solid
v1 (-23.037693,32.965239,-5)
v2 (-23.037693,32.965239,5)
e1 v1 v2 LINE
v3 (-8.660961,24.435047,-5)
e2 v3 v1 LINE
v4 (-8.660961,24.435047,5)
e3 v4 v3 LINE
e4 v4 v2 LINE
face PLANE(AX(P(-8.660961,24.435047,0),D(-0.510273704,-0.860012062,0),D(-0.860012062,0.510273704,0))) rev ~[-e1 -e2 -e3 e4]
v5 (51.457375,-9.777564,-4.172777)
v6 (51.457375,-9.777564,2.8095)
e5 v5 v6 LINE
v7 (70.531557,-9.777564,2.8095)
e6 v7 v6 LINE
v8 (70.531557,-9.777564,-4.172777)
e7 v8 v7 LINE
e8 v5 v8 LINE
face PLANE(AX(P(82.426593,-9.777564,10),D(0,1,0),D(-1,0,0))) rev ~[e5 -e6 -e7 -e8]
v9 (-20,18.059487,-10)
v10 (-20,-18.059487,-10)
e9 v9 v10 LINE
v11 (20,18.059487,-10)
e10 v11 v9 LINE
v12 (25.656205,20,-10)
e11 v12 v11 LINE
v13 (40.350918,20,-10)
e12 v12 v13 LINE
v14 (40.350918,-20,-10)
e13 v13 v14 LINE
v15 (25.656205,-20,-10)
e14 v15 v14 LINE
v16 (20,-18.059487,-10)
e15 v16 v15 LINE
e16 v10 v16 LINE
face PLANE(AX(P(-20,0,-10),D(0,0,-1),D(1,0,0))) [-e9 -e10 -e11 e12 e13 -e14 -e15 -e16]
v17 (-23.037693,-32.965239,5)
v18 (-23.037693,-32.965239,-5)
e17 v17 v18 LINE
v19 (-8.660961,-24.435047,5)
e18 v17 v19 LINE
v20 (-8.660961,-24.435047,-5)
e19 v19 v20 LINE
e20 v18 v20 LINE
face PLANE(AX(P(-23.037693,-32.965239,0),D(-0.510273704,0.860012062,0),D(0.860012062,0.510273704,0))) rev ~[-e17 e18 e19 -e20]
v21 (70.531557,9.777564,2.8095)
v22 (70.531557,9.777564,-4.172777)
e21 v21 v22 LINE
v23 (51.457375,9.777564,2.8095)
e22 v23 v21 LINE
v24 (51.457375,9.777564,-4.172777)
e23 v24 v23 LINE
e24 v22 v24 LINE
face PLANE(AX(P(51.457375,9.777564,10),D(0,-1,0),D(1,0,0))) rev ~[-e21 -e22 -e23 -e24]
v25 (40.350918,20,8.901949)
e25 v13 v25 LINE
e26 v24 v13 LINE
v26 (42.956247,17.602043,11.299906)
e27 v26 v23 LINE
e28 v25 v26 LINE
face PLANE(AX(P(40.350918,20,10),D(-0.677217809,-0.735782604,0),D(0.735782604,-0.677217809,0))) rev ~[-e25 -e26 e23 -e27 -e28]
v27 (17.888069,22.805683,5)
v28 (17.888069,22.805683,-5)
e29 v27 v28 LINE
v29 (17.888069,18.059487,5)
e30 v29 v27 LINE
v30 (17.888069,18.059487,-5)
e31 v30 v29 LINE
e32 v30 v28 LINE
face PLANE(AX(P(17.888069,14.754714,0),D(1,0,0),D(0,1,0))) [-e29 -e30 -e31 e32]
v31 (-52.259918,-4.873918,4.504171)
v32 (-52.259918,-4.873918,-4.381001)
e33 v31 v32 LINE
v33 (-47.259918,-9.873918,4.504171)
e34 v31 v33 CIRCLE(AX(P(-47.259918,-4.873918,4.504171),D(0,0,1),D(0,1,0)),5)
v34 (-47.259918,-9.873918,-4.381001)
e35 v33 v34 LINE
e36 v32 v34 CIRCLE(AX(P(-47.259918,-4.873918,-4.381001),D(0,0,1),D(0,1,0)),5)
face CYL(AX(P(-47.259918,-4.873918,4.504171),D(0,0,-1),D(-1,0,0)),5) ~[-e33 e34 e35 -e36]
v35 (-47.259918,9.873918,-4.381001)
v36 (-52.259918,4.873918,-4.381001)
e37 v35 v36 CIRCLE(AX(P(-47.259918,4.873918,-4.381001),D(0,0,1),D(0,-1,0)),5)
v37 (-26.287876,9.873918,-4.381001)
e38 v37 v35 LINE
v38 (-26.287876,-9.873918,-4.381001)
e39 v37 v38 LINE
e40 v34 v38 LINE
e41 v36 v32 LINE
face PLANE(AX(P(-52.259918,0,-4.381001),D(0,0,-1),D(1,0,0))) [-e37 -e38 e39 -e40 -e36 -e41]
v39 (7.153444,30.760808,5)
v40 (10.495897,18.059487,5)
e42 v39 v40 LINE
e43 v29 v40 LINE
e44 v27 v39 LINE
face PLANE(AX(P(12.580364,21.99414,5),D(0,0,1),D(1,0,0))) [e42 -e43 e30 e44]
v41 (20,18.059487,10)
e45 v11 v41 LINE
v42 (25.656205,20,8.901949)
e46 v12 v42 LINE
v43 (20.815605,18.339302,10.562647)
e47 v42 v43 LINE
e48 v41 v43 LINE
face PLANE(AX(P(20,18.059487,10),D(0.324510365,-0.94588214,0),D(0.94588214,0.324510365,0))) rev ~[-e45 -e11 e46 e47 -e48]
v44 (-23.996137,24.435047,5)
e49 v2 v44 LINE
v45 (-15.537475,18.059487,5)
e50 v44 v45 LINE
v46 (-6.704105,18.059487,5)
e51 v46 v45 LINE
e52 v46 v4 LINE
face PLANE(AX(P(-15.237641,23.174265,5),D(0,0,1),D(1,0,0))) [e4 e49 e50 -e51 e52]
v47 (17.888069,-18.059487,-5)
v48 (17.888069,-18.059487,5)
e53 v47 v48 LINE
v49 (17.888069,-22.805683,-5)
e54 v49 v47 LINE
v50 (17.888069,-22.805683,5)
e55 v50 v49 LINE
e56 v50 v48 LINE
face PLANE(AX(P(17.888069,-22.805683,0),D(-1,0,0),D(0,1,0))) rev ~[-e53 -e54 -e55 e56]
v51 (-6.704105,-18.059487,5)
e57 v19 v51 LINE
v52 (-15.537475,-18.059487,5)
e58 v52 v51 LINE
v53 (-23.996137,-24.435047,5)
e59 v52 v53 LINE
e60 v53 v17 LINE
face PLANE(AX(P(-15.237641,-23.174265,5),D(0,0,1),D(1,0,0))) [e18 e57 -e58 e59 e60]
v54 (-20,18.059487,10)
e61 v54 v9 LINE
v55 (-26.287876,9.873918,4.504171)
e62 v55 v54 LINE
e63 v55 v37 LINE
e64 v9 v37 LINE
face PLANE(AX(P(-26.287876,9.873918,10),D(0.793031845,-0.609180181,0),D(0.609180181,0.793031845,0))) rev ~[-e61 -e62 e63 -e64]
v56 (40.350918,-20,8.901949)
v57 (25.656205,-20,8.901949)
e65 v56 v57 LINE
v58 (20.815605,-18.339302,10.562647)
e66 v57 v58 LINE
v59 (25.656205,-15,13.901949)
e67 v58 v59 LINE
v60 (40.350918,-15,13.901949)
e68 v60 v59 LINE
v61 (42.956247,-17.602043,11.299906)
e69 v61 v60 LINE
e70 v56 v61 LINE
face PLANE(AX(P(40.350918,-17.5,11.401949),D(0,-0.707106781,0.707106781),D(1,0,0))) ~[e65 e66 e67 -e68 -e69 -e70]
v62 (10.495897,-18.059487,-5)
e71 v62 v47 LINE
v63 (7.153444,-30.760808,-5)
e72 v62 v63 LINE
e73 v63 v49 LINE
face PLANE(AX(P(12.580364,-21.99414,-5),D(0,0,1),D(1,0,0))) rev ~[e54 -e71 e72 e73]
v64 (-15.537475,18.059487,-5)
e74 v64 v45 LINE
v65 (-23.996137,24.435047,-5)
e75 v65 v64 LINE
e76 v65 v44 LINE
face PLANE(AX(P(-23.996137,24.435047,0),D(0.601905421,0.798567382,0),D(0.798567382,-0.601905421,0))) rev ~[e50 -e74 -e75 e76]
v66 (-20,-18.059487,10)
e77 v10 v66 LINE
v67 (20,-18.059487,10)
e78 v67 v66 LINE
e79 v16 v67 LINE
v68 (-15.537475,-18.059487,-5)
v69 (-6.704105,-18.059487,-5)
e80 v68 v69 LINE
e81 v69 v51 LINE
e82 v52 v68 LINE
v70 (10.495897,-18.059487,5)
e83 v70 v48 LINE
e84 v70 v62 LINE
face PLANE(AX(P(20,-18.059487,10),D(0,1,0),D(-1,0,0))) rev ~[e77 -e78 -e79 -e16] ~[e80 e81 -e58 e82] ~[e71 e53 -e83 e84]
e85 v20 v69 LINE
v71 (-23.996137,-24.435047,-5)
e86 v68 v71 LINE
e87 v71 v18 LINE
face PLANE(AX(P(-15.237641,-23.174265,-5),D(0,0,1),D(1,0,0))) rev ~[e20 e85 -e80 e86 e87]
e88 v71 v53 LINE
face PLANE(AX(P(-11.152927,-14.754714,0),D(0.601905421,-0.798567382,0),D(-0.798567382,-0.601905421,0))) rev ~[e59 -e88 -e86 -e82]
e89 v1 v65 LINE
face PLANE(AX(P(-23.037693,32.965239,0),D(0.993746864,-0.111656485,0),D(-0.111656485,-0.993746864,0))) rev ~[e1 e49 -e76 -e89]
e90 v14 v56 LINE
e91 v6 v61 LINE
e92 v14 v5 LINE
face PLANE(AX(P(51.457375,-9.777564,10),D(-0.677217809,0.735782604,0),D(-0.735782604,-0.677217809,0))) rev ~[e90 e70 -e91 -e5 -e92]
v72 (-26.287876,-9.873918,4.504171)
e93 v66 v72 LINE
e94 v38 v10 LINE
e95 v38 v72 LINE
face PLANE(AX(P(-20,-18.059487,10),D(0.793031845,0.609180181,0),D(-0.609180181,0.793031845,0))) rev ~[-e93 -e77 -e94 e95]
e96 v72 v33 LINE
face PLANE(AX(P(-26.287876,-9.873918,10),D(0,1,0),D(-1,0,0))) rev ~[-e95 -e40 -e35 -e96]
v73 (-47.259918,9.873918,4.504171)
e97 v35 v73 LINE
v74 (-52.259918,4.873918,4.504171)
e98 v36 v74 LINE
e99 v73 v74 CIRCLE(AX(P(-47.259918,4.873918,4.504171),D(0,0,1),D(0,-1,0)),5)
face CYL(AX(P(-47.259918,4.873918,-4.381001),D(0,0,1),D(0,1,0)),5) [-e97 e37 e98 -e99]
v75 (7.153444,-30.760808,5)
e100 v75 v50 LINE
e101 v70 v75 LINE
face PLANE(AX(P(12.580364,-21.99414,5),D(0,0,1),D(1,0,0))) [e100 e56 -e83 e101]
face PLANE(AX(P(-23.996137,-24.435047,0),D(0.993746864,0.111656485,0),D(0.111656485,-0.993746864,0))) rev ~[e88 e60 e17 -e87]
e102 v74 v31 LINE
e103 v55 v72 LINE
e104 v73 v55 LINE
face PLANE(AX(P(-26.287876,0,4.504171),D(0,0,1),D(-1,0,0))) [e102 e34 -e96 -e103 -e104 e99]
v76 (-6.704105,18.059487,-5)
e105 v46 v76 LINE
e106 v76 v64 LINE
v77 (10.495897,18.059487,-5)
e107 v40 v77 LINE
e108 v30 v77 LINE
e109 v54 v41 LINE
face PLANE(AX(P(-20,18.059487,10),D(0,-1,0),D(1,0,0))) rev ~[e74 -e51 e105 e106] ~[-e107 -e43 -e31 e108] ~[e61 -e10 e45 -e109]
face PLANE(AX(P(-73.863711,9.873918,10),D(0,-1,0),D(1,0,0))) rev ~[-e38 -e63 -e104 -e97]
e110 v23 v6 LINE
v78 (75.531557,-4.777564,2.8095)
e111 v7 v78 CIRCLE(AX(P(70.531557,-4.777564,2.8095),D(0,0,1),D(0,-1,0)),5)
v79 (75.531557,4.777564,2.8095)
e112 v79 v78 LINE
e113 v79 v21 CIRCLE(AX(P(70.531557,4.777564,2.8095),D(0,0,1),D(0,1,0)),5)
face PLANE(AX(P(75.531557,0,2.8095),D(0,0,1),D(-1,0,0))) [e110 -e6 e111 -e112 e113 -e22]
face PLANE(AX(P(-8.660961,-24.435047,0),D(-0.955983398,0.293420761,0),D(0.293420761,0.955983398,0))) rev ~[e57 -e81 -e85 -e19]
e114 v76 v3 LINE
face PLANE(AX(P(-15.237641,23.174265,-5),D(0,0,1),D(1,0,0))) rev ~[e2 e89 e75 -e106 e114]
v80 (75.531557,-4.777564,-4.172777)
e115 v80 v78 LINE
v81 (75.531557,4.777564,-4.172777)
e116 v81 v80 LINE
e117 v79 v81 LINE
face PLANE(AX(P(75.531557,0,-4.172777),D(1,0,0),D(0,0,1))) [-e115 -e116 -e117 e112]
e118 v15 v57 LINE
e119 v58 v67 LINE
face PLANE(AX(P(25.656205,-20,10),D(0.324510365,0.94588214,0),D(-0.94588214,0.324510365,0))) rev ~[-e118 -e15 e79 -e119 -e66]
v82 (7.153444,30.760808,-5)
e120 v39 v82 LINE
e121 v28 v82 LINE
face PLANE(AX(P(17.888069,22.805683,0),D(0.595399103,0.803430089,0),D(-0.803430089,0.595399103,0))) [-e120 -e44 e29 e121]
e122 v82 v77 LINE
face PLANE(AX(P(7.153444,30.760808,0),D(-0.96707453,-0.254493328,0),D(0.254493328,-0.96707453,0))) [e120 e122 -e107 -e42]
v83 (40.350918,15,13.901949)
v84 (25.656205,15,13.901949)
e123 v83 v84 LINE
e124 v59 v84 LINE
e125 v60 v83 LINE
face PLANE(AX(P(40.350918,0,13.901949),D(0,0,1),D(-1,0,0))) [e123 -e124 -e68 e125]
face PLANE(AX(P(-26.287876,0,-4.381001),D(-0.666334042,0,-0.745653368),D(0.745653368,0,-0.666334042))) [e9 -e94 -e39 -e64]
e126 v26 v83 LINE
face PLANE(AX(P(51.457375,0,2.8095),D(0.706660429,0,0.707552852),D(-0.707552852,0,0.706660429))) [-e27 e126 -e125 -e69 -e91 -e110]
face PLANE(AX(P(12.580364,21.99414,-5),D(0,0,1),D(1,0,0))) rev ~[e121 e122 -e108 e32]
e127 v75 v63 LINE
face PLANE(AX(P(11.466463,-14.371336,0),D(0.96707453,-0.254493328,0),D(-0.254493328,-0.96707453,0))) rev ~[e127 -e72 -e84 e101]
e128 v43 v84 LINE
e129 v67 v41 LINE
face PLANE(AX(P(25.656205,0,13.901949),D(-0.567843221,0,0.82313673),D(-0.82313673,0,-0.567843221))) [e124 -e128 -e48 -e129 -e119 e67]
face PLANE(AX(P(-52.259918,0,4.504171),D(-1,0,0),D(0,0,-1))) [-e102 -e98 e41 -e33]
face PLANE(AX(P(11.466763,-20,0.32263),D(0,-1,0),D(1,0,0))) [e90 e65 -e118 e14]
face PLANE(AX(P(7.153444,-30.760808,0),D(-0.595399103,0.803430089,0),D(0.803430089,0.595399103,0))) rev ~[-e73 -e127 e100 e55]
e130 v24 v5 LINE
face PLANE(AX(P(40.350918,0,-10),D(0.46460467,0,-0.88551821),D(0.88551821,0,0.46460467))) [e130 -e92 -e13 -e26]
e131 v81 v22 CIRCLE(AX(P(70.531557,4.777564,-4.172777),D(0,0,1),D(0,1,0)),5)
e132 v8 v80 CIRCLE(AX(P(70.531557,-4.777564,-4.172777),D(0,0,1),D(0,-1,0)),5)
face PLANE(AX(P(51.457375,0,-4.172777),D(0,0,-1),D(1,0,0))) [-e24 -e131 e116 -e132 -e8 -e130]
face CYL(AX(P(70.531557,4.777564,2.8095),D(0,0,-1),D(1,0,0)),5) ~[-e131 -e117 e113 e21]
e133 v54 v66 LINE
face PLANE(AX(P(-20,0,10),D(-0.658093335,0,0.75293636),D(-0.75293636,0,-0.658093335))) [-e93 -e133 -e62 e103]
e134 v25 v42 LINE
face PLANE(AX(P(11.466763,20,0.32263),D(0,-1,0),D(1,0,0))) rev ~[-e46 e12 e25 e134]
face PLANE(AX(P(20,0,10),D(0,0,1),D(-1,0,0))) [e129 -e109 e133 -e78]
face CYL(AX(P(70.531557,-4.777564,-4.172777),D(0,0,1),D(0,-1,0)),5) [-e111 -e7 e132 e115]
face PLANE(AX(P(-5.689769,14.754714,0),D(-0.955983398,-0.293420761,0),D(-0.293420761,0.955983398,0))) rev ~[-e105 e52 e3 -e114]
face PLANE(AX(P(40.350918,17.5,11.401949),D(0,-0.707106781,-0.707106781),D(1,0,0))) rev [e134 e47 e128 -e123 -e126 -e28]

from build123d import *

# Parameters (mm, degrees)
F1_DEPTH = 20
F3_DEPTH = 43.4
F5_DEPTH = 5
F6_R     = 5
F8_SIZE  = 5


# Not quite as in the source:
# - a feature names something its author has since deleted; it is built from what else it names


with BuildPart() as f1:
    # F0 (on Front) → F1 (new body, symmetric)
    with BuildSketch(Plane.XZ):
        Polygon((20, 10), (-20, 10), (-26.2878760695, 4.5041712001), (-52.2599183023, 4.5041712001), (-52.2599183023, -4.38100053), (-26.2878760695, -4.38100053), (-20, -10), (20, -10), (40.3509177268, -10), (51.457375288, -4.1727770417), (75.5315572023, -4.1727770417), (75.5315572023, 2.809499735), (51.457375288, 2.809499735), (40.3509177268, 13.9019489288), (25.6562046707, 13.9019489288), align=None)
    extrude(amount=F1_DEPTH, both=True)

    # F2 (on face) → F3 (cut, symmetric)
    with BuildSketch(Plane.XY.offset(10)):
        Polygon((-20, 18.0594865233), (20, 18.0594865233), (25.6562046707, 20), (40.3509177268, 20), (51.457375288, 9.7775636241), (82.4265927076, 9.7775636241), (82.4265927076, -9.7775636241), (51.457375288, -9.7775636241), (40.3509177268, -20), (25.6562046707, -20), (20, -18.0594865233), (-20, -18.0594865233), (-26.2878760695, -9.8739182577), (-73.8637112081, -9.8739182577), (-73.8637112081, -40.0371998549), (108.4082424641, -42.2960631549), (105.6976020336, 36.3123118877), (-67.5570517778, 60.9338954091), (-73.8637112081, 9.8739182577), (-26.2878760695, 9.8739182577), align=None)
    extrude(amount=F3_DEPTH, both=True, mode=Mode.SUBTRACT)

    # F4 (on Top) → F5 (join, symmetric)
    with BuildSketch(Plane.XY):
        Polygon((17.8880691528, -22.8056833148), (17.8880691528, -14.7547144443), (11.4664630964, -14.3713355064), (7.1534435265, -30.7608079165), align=None)
        Polygon((-5.6897685863, -14.7547144443), (-11.1529268324, -14.7547144443), (-23.9961370826, -24.4350470603), (-23.0376925319, -32.9652391374), (-8.6609609425, -24.4350470603), align=None)
        Polygon((-8.6609609425, 24.4350470603), (-23.0376925319, 32.9652391374), (-23.9961370826, 24.4350470603), (-11.1529268324, 14.7547144443), (-5.6897685863, 14.7547144443), align=None)
        Polygon((7.1534435265, 30.7608079165), (11.4664630964, 14.3713355064), (17.8880691528, 14.7547144443), (17.8880691528, 22.8056833148), align=None)
    extrude(amount=F5_DEPTH, both=True)

    # F6
    f6_edges = [f1.edges().sort_by_distance(p)[0] for p in [
        (-52.259918, 9.873918, 0.061585),
        (75.531557, 9.777564, -0.681639),
        (75.531557, -9.777564, -0.681639),
        (-52.259918, -9.873918, 0.061585),
    ]]
    fillet(f6_edges, radius=F6_R)

    # F8
    f8_edges = [f1.edges().sort_by_distance(p)[0] for p in [
        (33.003561, -20, 13.901949),
        (33.003561, 20, 13.901949),
    ]]
    chamfer(f8_edges, length=F8_SIZE)


solid = f1.part
